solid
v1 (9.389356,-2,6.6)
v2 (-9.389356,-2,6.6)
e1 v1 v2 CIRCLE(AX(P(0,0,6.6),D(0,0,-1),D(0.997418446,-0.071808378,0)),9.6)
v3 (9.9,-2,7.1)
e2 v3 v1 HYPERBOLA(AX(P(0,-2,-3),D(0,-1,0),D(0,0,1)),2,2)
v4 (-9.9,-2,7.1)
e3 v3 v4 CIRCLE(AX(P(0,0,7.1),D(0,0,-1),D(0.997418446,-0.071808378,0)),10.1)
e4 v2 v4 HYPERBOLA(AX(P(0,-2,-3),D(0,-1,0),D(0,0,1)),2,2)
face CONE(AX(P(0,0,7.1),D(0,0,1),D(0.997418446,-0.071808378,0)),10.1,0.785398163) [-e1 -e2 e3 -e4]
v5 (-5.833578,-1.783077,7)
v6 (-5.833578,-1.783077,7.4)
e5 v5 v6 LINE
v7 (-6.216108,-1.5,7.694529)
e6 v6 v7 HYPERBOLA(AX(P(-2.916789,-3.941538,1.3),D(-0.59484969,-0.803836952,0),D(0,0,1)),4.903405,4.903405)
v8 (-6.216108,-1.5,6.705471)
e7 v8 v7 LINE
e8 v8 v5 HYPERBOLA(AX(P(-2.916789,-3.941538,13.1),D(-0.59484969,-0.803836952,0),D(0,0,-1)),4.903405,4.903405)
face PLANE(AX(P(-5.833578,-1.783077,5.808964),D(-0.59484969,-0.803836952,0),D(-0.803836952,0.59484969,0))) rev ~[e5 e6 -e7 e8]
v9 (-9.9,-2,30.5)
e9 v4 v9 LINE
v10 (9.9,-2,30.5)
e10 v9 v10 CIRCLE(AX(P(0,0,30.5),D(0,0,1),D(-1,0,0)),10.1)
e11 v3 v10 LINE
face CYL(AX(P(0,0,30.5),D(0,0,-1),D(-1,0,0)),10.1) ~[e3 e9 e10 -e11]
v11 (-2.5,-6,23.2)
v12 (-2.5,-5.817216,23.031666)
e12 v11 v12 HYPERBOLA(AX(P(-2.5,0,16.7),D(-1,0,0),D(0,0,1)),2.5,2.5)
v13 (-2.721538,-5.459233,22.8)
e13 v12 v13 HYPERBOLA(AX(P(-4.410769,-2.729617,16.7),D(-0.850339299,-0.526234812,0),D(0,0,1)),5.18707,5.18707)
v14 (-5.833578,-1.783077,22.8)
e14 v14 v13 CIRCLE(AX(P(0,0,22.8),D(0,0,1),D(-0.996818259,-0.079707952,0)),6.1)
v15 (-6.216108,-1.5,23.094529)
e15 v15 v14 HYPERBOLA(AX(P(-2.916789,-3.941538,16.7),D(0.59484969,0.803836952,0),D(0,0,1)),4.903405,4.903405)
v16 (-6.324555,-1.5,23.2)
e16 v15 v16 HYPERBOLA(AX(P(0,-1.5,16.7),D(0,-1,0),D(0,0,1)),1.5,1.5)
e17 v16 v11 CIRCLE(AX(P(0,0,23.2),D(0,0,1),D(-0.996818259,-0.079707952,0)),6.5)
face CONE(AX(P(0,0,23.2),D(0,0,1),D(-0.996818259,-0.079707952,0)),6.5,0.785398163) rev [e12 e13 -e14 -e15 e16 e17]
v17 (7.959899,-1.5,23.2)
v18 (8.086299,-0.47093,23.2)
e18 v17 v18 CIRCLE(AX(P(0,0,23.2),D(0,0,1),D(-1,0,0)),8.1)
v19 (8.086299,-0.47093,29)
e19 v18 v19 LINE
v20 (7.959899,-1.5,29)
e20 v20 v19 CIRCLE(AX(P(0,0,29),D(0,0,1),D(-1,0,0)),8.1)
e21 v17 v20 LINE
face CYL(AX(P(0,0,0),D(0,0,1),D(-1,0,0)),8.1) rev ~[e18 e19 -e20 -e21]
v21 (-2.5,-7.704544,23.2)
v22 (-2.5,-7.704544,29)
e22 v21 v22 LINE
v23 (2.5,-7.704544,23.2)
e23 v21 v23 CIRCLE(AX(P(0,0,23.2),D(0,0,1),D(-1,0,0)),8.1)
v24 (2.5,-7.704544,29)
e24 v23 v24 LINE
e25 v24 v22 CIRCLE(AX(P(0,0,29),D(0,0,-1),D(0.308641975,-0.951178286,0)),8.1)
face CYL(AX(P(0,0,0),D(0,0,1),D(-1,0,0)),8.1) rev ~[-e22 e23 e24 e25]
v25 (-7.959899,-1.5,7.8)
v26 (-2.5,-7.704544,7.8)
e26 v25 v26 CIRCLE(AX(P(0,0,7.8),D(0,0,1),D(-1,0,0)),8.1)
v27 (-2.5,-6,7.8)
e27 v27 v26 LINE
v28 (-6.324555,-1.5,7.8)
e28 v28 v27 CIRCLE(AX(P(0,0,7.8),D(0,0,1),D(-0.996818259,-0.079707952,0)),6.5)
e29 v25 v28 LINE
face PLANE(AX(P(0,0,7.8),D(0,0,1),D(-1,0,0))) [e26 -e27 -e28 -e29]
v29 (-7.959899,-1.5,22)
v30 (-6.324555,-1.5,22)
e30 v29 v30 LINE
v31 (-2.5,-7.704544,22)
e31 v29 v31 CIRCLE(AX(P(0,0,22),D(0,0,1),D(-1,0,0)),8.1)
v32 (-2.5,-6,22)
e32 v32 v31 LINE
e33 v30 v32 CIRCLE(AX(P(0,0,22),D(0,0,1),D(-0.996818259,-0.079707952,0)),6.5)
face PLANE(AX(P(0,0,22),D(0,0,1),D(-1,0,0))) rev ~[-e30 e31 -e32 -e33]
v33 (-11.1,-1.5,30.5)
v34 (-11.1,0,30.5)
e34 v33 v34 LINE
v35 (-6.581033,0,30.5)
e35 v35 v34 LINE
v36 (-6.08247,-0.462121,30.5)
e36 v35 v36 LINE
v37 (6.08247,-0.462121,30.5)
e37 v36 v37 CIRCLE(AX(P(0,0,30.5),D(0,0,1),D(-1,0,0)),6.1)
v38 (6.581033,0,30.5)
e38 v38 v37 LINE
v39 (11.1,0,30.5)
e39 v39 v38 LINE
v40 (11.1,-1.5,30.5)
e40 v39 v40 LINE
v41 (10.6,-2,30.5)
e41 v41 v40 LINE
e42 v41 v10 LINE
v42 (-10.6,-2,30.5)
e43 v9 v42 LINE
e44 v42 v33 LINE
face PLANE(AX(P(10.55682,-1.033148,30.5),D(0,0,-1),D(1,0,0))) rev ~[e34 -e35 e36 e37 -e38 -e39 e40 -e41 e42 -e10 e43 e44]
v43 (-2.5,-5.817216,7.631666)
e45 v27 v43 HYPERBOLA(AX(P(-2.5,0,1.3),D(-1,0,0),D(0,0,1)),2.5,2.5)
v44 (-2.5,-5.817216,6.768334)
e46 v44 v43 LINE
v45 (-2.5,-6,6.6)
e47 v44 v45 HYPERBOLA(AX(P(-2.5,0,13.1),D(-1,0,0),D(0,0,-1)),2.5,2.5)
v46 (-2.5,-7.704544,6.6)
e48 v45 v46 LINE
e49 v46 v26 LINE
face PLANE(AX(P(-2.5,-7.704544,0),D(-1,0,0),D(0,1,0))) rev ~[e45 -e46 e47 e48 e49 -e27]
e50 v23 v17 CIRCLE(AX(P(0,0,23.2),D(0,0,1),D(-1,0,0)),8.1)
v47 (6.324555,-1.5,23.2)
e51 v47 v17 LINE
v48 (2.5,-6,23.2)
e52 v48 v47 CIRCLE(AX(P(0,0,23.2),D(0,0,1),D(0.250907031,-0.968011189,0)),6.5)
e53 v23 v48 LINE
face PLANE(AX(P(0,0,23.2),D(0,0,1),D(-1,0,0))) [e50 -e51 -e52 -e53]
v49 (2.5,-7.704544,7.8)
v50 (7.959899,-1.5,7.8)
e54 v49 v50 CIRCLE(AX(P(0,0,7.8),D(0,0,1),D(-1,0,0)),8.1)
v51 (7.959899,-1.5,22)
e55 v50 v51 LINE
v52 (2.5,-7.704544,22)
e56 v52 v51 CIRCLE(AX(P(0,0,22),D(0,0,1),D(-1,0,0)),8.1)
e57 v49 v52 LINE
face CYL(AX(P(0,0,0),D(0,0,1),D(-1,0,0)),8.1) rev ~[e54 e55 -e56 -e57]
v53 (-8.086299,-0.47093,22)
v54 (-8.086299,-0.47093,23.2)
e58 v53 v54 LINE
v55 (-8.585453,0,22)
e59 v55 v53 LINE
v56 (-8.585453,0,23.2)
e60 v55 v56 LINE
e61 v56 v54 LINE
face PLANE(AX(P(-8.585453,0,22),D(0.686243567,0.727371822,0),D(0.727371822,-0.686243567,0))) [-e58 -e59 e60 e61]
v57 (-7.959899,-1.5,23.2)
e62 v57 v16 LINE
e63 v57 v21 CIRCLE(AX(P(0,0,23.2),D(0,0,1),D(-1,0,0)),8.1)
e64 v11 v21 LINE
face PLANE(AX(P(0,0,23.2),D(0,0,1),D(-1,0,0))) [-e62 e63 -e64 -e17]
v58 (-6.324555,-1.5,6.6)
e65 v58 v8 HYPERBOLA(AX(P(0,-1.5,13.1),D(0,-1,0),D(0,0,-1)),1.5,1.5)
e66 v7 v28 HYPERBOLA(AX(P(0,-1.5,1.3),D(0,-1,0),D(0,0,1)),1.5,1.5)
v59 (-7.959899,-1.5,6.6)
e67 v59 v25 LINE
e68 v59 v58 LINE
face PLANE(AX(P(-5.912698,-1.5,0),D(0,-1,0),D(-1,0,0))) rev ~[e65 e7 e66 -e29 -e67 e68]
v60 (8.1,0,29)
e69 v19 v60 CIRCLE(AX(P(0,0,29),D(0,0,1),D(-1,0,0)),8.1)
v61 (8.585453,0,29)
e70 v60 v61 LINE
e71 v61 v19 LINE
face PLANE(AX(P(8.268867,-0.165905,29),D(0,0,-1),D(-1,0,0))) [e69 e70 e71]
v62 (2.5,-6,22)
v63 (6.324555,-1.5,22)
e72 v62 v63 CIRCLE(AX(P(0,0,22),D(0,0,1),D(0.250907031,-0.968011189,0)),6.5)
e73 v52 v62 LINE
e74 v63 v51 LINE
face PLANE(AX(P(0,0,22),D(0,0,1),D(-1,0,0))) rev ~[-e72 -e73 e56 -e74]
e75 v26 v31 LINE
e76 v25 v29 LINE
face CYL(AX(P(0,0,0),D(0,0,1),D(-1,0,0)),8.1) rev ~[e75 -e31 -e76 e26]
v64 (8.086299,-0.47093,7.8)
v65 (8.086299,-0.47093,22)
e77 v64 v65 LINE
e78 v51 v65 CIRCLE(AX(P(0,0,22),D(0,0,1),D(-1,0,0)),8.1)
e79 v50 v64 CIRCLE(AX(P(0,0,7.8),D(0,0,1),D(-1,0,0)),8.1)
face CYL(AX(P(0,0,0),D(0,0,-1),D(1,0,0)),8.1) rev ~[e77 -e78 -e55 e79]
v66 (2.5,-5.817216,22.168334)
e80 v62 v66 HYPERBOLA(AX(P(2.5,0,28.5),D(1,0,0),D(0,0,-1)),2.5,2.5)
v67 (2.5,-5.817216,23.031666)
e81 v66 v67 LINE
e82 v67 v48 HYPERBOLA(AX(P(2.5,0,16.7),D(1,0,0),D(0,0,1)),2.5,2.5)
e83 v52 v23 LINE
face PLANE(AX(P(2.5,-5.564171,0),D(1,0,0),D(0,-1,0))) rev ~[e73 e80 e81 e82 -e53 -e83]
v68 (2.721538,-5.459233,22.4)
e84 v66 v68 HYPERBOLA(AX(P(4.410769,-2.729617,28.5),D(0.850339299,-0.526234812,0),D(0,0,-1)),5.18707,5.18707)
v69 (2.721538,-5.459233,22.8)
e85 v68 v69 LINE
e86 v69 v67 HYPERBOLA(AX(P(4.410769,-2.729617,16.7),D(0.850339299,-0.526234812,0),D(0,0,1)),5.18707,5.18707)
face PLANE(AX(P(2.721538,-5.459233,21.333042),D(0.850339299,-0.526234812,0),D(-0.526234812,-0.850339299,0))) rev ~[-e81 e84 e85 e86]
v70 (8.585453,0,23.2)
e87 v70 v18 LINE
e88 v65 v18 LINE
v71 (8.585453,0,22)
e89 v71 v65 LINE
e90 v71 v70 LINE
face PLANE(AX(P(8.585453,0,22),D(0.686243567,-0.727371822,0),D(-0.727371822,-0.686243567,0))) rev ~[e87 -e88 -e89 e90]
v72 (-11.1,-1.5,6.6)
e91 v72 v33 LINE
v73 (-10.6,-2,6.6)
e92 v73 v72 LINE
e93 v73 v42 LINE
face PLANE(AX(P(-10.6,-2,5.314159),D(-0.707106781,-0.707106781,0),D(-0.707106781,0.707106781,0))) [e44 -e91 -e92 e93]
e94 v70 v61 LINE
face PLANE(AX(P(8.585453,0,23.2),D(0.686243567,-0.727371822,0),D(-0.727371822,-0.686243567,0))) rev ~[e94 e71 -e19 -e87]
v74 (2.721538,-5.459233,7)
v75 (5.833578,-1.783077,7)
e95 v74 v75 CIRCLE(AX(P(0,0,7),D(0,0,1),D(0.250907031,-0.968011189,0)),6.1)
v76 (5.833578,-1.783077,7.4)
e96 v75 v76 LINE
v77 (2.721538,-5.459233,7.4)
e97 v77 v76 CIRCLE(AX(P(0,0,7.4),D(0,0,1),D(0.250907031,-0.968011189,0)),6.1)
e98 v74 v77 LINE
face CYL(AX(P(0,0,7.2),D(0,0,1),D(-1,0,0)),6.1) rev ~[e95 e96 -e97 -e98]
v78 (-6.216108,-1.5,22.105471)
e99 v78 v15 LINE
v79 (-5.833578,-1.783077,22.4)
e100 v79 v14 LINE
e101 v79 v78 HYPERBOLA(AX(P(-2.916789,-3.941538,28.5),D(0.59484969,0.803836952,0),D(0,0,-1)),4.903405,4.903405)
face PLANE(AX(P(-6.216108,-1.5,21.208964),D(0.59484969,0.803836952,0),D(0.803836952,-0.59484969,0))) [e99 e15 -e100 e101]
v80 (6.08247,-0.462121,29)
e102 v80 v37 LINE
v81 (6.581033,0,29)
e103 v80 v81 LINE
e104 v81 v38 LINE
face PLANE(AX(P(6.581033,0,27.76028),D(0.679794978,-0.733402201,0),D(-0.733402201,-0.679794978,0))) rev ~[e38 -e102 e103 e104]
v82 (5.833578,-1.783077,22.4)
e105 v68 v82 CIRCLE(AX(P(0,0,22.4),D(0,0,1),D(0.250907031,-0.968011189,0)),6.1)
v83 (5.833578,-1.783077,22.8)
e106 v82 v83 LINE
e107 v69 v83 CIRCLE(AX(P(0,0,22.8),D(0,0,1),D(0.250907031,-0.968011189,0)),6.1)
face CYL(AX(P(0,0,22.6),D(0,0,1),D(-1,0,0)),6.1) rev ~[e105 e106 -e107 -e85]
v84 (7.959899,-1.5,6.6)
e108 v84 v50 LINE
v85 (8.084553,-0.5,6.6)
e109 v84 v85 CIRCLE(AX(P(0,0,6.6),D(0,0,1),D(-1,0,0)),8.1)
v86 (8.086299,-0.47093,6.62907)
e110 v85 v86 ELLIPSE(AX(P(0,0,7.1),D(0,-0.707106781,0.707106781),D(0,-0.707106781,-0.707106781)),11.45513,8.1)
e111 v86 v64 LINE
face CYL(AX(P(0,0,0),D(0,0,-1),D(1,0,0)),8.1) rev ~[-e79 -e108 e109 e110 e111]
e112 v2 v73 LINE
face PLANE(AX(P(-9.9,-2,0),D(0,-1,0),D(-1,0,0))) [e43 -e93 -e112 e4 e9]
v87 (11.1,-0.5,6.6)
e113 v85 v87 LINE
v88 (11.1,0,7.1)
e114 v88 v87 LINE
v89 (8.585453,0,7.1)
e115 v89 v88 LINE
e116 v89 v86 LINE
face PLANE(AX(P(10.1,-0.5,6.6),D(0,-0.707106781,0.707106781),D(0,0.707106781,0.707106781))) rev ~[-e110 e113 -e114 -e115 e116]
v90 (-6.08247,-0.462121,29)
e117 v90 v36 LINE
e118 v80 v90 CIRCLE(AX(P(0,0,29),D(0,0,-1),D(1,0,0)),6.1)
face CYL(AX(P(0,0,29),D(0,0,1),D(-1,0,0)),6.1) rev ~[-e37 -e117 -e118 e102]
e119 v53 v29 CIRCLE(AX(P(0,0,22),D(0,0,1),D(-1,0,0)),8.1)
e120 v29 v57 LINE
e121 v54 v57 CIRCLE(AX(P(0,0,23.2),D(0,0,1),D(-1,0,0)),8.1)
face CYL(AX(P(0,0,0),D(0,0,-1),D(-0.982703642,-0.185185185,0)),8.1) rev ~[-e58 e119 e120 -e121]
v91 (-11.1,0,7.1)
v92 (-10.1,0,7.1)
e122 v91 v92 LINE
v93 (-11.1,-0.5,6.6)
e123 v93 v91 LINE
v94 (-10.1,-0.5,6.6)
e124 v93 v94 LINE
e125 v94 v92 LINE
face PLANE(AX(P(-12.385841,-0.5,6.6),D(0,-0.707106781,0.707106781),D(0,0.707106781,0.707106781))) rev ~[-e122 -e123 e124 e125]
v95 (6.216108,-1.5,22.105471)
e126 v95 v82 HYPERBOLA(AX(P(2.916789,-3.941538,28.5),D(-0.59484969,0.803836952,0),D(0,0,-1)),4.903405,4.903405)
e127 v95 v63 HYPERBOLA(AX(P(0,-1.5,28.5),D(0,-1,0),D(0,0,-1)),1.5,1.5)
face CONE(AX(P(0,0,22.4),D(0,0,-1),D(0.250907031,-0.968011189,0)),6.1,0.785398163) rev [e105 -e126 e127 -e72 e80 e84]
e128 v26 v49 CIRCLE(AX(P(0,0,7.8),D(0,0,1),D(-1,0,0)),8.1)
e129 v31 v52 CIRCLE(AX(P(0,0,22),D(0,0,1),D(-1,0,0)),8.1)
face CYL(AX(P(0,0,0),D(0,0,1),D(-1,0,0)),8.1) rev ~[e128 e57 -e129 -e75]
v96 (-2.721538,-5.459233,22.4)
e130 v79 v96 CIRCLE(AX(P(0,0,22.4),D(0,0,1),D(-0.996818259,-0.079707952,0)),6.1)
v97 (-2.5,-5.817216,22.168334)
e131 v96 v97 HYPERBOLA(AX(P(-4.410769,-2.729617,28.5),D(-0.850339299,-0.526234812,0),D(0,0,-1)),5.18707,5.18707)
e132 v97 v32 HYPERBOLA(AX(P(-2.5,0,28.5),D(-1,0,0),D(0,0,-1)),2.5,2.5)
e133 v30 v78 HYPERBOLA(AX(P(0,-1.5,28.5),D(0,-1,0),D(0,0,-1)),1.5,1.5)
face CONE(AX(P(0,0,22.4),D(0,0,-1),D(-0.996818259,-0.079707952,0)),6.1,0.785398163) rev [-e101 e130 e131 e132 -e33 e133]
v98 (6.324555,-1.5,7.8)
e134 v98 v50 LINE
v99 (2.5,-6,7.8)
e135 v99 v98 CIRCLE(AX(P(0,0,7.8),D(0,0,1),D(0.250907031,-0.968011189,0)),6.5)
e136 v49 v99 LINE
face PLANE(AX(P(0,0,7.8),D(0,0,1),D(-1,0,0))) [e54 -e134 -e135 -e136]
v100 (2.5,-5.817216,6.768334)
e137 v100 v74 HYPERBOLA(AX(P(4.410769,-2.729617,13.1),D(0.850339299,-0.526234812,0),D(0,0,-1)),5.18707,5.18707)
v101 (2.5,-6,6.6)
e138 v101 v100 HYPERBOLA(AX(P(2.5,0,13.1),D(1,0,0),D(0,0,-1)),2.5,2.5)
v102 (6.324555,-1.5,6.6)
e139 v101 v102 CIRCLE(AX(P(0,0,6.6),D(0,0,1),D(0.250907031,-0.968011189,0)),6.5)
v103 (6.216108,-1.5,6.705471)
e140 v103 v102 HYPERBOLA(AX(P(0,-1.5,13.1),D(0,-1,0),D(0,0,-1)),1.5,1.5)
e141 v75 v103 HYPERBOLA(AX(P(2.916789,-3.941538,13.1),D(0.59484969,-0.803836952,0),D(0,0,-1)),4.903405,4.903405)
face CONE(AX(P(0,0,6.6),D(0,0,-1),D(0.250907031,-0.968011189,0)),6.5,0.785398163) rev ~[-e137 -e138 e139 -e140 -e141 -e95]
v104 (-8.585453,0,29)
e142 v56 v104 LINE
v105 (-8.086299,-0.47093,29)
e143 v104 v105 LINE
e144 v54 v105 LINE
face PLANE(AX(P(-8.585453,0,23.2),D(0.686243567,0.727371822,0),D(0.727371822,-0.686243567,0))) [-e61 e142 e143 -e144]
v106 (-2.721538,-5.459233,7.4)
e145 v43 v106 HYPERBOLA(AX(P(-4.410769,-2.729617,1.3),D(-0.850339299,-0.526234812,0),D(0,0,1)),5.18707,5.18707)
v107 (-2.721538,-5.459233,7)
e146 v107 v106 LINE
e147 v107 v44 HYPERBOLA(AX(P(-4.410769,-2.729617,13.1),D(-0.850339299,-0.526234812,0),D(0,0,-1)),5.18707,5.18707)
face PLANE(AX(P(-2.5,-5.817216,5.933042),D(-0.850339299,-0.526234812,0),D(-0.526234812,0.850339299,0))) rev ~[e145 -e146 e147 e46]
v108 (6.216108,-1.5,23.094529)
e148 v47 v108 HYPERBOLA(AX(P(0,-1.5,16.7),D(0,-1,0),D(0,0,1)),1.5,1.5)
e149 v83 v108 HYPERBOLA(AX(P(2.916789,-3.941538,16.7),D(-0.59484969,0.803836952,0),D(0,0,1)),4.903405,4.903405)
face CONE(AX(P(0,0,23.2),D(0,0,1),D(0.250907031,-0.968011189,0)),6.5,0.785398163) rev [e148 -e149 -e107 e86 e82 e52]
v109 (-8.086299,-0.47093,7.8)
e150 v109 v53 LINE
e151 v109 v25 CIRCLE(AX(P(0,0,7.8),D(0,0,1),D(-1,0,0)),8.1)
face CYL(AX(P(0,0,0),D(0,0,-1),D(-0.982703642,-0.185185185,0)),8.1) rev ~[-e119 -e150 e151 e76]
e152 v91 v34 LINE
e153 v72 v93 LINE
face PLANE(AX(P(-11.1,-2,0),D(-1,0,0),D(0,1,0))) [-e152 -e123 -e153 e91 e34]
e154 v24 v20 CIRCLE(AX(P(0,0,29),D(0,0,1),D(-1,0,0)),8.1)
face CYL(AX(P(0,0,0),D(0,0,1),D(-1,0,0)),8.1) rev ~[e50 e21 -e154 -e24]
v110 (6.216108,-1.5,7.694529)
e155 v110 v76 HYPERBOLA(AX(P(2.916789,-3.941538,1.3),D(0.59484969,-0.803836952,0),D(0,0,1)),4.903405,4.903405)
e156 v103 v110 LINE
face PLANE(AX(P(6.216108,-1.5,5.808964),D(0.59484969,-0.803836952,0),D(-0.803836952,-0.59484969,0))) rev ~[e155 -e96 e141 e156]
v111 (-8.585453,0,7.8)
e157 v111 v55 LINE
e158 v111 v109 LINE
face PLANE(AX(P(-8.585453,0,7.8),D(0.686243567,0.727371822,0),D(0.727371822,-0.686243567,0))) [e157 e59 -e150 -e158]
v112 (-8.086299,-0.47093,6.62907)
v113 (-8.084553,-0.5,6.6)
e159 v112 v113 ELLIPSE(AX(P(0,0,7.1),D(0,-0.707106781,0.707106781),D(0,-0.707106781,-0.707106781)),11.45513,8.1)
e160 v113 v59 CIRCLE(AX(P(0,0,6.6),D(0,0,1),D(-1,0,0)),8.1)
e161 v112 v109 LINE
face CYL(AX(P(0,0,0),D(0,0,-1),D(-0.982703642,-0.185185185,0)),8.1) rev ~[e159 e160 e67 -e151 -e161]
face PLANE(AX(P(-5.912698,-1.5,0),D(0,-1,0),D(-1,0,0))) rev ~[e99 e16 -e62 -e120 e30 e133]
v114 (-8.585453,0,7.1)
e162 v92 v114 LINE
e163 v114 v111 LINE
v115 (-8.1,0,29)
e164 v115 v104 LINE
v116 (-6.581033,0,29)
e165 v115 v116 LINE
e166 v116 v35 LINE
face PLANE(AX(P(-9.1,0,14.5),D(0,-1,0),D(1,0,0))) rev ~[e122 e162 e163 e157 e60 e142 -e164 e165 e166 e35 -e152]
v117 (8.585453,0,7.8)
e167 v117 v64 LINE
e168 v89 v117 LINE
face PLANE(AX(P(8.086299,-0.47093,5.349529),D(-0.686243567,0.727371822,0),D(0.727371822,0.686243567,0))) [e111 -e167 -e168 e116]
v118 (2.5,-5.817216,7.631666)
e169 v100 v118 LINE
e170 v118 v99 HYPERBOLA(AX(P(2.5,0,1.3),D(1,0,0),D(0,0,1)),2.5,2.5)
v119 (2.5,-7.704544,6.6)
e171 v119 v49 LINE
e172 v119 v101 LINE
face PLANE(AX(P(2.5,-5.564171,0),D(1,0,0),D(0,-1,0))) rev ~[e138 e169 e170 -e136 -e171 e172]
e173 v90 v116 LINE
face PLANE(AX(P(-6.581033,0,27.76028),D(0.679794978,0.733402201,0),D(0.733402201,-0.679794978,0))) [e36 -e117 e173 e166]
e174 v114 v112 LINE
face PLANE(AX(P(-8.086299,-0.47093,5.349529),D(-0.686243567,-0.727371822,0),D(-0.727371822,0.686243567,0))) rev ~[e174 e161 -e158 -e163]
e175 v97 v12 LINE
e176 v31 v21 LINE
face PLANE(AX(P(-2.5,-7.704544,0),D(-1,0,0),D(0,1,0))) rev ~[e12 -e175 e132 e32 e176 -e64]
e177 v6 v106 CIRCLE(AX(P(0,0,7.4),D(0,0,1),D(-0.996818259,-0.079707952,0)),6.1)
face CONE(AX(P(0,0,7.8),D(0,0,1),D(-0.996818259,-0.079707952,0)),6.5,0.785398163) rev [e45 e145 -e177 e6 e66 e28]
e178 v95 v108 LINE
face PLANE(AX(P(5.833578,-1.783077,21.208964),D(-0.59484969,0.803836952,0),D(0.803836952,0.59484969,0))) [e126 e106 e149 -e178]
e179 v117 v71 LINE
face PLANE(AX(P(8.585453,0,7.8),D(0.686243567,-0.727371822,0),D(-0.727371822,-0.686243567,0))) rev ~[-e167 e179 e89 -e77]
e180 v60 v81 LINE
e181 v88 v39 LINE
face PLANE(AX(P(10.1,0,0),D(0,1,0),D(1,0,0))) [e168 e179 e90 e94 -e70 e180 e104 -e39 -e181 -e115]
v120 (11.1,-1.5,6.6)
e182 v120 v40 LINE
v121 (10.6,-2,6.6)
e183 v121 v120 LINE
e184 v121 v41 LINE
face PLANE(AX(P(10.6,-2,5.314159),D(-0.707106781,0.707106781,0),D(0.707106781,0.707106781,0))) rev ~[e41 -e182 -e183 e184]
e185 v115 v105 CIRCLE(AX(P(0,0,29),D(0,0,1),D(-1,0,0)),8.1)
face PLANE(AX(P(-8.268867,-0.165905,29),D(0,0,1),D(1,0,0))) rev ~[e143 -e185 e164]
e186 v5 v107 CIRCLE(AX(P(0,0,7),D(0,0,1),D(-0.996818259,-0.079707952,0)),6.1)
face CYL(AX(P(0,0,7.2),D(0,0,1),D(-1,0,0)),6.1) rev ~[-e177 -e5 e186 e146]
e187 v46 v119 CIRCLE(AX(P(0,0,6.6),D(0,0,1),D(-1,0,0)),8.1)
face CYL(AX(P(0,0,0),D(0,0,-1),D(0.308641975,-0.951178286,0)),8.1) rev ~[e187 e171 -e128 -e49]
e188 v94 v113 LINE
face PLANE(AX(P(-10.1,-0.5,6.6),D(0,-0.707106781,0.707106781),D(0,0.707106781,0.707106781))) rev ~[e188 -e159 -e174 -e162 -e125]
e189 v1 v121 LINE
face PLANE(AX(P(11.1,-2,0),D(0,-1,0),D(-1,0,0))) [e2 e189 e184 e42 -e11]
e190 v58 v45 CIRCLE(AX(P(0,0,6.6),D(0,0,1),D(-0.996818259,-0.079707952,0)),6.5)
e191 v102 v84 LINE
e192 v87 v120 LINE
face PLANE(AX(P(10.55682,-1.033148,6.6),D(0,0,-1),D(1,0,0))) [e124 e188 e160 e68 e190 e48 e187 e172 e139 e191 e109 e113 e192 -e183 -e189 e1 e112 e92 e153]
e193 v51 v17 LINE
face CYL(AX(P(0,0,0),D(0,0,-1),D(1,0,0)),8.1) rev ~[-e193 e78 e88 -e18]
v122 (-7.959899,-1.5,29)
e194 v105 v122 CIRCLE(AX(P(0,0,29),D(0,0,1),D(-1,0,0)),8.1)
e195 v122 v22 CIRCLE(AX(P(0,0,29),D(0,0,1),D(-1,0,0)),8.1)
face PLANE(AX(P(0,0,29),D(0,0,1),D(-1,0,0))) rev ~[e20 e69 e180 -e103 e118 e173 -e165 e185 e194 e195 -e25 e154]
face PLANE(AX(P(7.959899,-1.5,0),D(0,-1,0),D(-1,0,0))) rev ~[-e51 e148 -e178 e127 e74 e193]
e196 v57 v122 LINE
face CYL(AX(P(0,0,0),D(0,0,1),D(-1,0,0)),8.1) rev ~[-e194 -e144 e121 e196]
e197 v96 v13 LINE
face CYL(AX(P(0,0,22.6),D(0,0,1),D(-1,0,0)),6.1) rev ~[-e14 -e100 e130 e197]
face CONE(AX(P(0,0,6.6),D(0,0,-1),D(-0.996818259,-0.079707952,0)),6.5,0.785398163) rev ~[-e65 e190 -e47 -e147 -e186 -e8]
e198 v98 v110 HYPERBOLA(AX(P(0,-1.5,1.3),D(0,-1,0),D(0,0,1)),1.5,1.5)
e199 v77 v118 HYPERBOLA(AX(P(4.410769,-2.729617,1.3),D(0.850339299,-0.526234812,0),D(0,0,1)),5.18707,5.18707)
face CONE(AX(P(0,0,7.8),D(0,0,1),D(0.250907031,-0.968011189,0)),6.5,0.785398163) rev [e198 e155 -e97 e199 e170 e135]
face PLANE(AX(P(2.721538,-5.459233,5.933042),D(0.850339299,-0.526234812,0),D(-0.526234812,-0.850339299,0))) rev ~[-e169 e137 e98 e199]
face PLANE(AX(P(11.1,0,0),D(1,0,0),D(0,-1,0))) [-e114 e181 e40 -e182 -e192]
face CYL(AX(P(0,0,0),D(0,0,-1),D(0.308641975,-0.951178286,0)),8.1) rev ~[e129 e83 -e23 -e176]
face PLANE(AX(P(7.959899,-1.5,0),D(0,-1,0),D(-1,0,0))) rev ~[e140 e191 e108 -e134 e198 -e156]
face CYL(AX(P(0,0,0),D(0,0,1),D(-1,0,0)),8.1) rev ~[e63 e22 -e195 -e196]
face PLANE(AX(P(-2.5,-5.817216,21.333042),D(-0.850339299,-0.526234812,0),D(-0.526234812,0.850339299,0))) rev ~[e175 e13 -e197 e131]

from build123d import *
from build123d import SkipClean  # not in build123d's __all__

# Parameters (mm, degrees)
F0_W         = 2
F0_H         = 1.2
F1_ANGLE     = 180
F3_DEPTH     = 29
F5_DEPTH     = 30.5
F6_DEPTH     = 6.6
F7_T1_DEPTH  = 26.471682988
F7_T3_DEPTH  = 14.2
F7_T5_DEPTH  = 2.285841494
F7_T7_DEPTH  = 3.285841494
F7_T9_DEPTH  = 3.9794390696
F7_T11_DEPTH = 3.285841494
F7_T13_DEPTH = 2.285841494
F7_T15_DEPTH = 2.4504714643
F7_T17_DEPTH = 1.2
F7_T19_DEPTH = 5.8
F7_T24_ANGLE = 171.7642778101
F8_T1_DEPTH  = 2.5339152929
F8_T3_DEPTH  = 2.7820723675
F8_T5_DEPTH  = 2.7820723675
F8_T7_DEPTH  = 2.5339152929
F8_T10_ANGLE = 70.8970289143
F8_T12_ANGLE = 70.8970289143
F8_T14_ANGLE = 70.8970289143
F8_T16_ANGLE = 70.8970289143
F8_T18_ANGLE = 70.8970289143
F8_T20_ANGLE = 70.8970289143
F8_T22_ANGLE = 70.8970289143
F8_T24_ANGLE = 70.8970289143


# Not quite as in the source:
# - a fillet or chamfer that OpenCascade refuses, or shapes differently, is made with other operations: its cross-section is extruded or revolved along the edge and cut away or added
# - a feature names something its author has since deleted; it is built from what else it names


with BuildPart() as f1:
    # F0 (on Front) → F1 (revolve)
    with BuildSketch(Plane.XZ):
        Polygon((-10.1, 0), (-8.1, 0), (-8.1, 6.6), (-8.1, 7.8), (-8.1, 12.7), (-8.1, 13.9), (-8.1, 15.8), (-8.1, 17), (-8.1, 22), (-8.1, 23.2), (-8.1, 29), (-10.1, 29), align=None)
        with Locations((-7.1, 22.6)):
            Rectangle(F0_W, F0_H)
        with Locations((-7.1, 7.2)):
            Rectangle(F0_W, F0_H)
        Polygon((-10.1, 30.5), (-10.1, 29), (-8.1, 29), (-6.1, 29), (-6.1, 30.5), align=None)
    revolve(axis=Axis((0, 0, 18.970021978), (0, 0, 1)), revolution_arc=F1_ANGLE)

    # F2 (on face) → F3 (cut, through all)
    with BuildSketch(Plane(origin=(0, 0, 0), x_dir=(1, 0, 0), z_dir=(0, 0, -1))):
        with BuildLine():
            Line((2.5, 5.5641710973), (2.5, 7.7045441137))
            ThreePointArc((2.5, 7.7045441137), (0, 8.1), (-2.5, 7.7045441137))
            Line((-2.5, 7.7045441137), (-2.5, 5.5641710973))
            Line((-2.5, 5.5641710973), (2.5, 5.5641710973))
        make_face()
        with BuildLine():
            ThreePointArc((8.1, 0), (8.0648988191, 0.7532642549), (7.9598994969, 1.5))
            Line((7.9598994969, 1.5), (5.9126981996, 1.5))
            Line((5.9126981996, 1.5), (5.9126981996, 0))
            Line((5.9126981996, 0), (8.1, 0))
        make_face()
        with BuildLine():
            Line((-5.9126981996, 1.5), (-7.9598994969, 1.5))
            ThreePointArc((-7.9598994969, 1.5), (-8.0648988191, 0.7532642549), (-8.1, 0))
            Line((-8.1, 0), (-5.9126981996, 0))
            Line((-5.9126981996, 0), (-5.9126981996, 1.5))
        make_face()
    with SkipClean():  # cleaning this boolean's faces spoils the solid; the shape is the same uncleaned
        extrude(amount=-F3_DEPTH, mode=Mode.SUBTRACT)

    # F4 (on face) → F5 (join, through all)
    with BuildSketch(Plane(origin=(0, 0, 0), x_dir=(1, 0, 0), z_dir=(0, 0, -1))):
        with BuildLine():
            Line((11.1, 2), (9.9, 2))
            ThreePointArc((9.9, 2), (10.0498756211, 1.0049875621), (10.1, 0))
            Line((10.1, 0), (11.1, 0))
            Line((11.1, 0), (11.1, 2))
        make_face()
        with BuildLine():
            Line((-11.1, 0), (-10.1, 0))
            ThreePointArc((-10.1, 0), (-10.0498756211, 1.0049875621), (-9.9, 2))
            Line((-9.9, 2), (-11.1, 2))
            Line((-11.1, 2), (-11.1, 0))
        make_face()
    with SkipClean():  # cleaning this boolean's faces spoils the solid; the shape is the same uncleaned
        extrude(amount=-F5_DEPTH)

    # F4 (on face) + F2 (on face) → F6 (cut, through all)
    with BuildSketch(Plane(origin=(0, 0, 0), x_dir=(1, 0, 0), z_dir=(0, 0, -1))):
        with BuildLine():
            Line((-9.1, 2), (-9.1, 0))
            Line((-9.1, 0), (-8.1, 0))
            ThreePointArc((-8.1, 0), (-8.0648988191, 0.7532642549), (-7.9598994969, 1.5))
            ThreePointArc((-7.9598994969, 1.5), (-6.0808277632, 5.3510310889), (-2.5, 7.7045441137))
            ThreePointArc((-2.5, 7.7045441137), (0, 8.1), (2.5, 7.7045441137))
            ThreePointArc((2.5, 7.7045441137), (6.0808277632, 5.3510310889), (7.9598994969, 1.5))
            ThreePointArc((7.9598994969, 1.5), (8.0648988191, 0.7532642549), (8.1, 0))
            Line((8.1, 0), (9.1, 0))
            Line((9.1, 0), (9.1, 2))
            Line((9.1, 2), (9.9, 2))
            ThreePointArc((9.9, 2), (0, 10.1), (-9.9, 2))
            Line((-9.9, 2), (-9.1, 2))
        make_face()
        with BuildLine():
            Line((-11.1, 0), (-10.1, 0))
            ThreePointArc((-10.1, 0), (-10.0498756211, 1.0049875621), (-9.9, 2))
            Line((-9.9, 2), (-11.1, 2))
            Line((-11.1, 2), (-11.1, 0))
        make_face()
        with BuildLine():
            Line((-10.1, 0), (-9.1, 0))
            Line((-9.1, 0), (-9.1, 2))
            Line((-9.1, 2), (-9.9, 2))
            ThreePointArc((-9.9, 2), (-10.0498756211, 1.0049875621), (-10.1, 0))
        make_face()
        with BuildLine():
            Line((11.1, 2), (9.9, 2))
            ThreePointArc((9.9, 2), (10.0498756211, 1.0049875621), (10.1, 0))
            Line((10.1, 0), (11.1, 0))
            Line((11.1, 0), (11.1, 2))
        make_face()
    with BuildSketch(Plane(origin=(0, 0, 0), x_dir=(1, 0, 0), z_dir=(0, 0, -1))):
        with BuildLine():
            ThreePointArc((-2.5, 7.7045441137), (0, 8.1), (2.5, 7.7045441137))
            ThreePointArc((2.5, 7.7045441137), (6.0808277632, 5.3510310889), (7.9598994969, 1.5))
            ThreePointArc((7.9598994969, 1.5), (8.0648988191, 0.7532642549), (8.1, 0))
            Line((8.1, 0), (10.1, 0))
            ThreePointArc((10.1, 0), (0, 10.1), (-10.1, 0))
            Line((-10.1, 0), (-8.1, 0))
            ThreePointArc((-8.1, 0), (-8.0648988191, 0.7532642549), (-7.9598994969, 1.5))
            ThreePointArc((-7.9598994969, 1.5), (-6.0808277632, 5.3510310889), (-2.5, 7.7045441137))
        make_face()
    with SkipClean():  # cleaning this boolean's faces spoils the solid; the shape is the same uncleaned
        extrude(amount=-F6_DEPTH, mode=Mode.SUBTRACT)

    # F7: chamfer of 0.5 on 11 edges, made by hand

    # F7_s2 → F7_t1 (cut)
    with BuildSketch(Plane.XY.offset(5.314158506)):
        Polygon((-10.6, -2), (-11.1, -1.5), (-11.1, -2), align=None)
        Polygon((10.6, -2), (11.1, -1.5), (11.1, -2), align=None)
    with SkipClean():  # cleaning this boolean's faces spoils the solid; the shape is the same uncleaned
        extrude(amount=F7_T1_DEPTH, mode=Mode.SUBTRACT)

    # F7_s4 → F7_t3 (cut)
    with BuildSketch(Plane.XY.offset(7.8)):
        with BuildLine():
            Line((8.5854528128, 0), (8.0862985795, -0.4709302326))
            ThreePointArc((8.0862985795, -0.4709302326), (8.0963649191, -0.2426419097), (8.1, 0))
            Line((8.1, 0), (8.5854528128, 0))
        make_face()
        with BuildLine():
            Line((-8.5854528128, 0), (-8.0862985795, -0.4709302326))
            ThreePointArc((-8.0862985795, -0.4709302326), (-8.0963649191, -0.2426419097), (-8.1, 0))
            Line((-8.1, 0), (-8.5854528128, 0))
        make_face()
    extrude(amount=F7_T3_DEPTH, mode=Mode.SUBTRACT)

    # F7_s6 → F7_t5 (cut)
    with BuildSketch(Plane.YZ.offset(-12.385841494)):
        Polygon((-0.5, 6.6), (0, 7.1), (0, 6.6), align=None)
    extrude(amount=F7_T5_DEPTH, mode=Mode.SUBTRACT)

    # F7_s8 → F7_t7 (cut)
    with BuildSketch(Plane.YZ.offset(-10.1)):
        Polygon((-0.5, 6.6), (0, 7.1), (0, 6.6), align=None)
    extrude(amount=F7_T7_DEPTH, mode=Mode.SUBTRACT)

    # F7_s10 → F7_t9 (cut)
    with BuildSketch(Plane.XY.offset(27.7602804652)):
        with BuildLine():
            Line((-6.5810333535, 0), (-6.0824702207, -0.4621212121))
            ThreePointArc((-6.0824702207, -0.4621212121), (-6.0953433287, -0.2383059061), (-6.1, 0))
            Line((-6.1, 0), (-6.5810333535, 0))
        make_face()
        with BuildLine():
            Line((6.5810333535, 0), (6.0824702207, -0.4621212121))
            ThreePointArc((6.0824702207, -0.4621212121), (6.0953433287, -0.2383059061), (6.1, 0))
            Line((6.1, 0), (6.5810333535, 0))
        make_face()
    with SkipClean():  # cleaning this boolean's faces spoils the solid; the shape is the same uncleaned
        extrude(amount=F7_T9_DEPTH, mode=Mode.SUBTRACT)

    # F7_s12 → F7_t11 (cut)
    with BuildSketch(Plane.YZ.offset(6.814158506)):
        Polygon((-0.5, 6.6), (0, 7.1), (0, 6.6), align=None)
    extrude(amount=F7_T11_DEPTH, mode=Mode.SUBTRACT)

    # F7_s14 → F7_t13 (cut)
    with BuildSketch(Plane.YZ.offset(10.1)):
        Polygon((-0.5, 6.6), (0, 7.1), (0, 6.6), align=None)
    extrude(amount=F7_T13_DEPTH, mode=Mode.SUBTRACT)

    # F7_s16 → F7_t15 (cut)
    with BuildSketch(Plane.XY.offset(5.3495285357)):
        with BuildLine():
            Line((-8.0862985795, -0.4709302326), (-8.5854528128, 0))
            Line((-8.5854528128, 0), (-8.1, 0))
            ThreePointArc((-8.1, 0), (-8.0963649191, -0.2426419097), (-8.0862985795, -0.4709302326))
        make_face()
        with BuildLine():
            Line((8.0862985795, -0.4709302326), (8.5854528128, 0))
            Line((8.5854528128, 0), (8.1, 0))
            ThreePointArc((8.1, 0), (8.0963649191, -0.2426419097), (8.0862985795, -0.4709302326))
        make_face()
    with SkipClean():  # cleaning this boolean's faces spoils the solid; the shape is the same uncleaned
        extrude(amount=F7_T15_DEPTH, mode=Mode.SUBTRACT)

    # F7_s18 → F7_t17 (cut)
    with BuildSketch(Plane.XY.offset(22)):
        with BuildLine():
            Line((-8.5854528128, 0), (-8.0862985795, -0.4709302326))
            ThreePointArc((-8.0862985795, -0.4709302326), (-8.0963649191, -0.2426419097), (-8.1, 0))
            Line((-8.1, 0), (-8.5854528128, 0))
        make_face()
        with BuildLine():
            Line((8.5854528128, 0), (8.0862985795, -0.4709302326))
            ThreePointArc((8.0862985795, -0.4709302326), (8.0963649191, -0.2426419097), (8.1, 0))
            Line((8.1, 0), (8.5854528128, 0))
        make_face()
    with SkipClean():  # cleaning this boolean's faces spoils the solid; the shape is the same uncleaned
        extrude(amount=F7_T17_DEPTH, mode=Mode.SUBTRACT)

    # F7_s20 → F7_t19 (cut)
    with BuildSketch(Plane.XY.offset(23.2)):
        with BuildLine():
            Line((-8.5854528128, 0), (-8.0862985795, -0.4709302326))
            ThreePointArc((-8.0862985795, -0.4709302326), (-8.0963649191, -0.2426419097), (-8.1, 0))
            Line((-8.1, 0), (-8.5854528128, 0))
        make_face()
        with BuildLine():
            Line((8.5854528128, 0), (8.0862985795, -0.4709302326))
            ThreePointArc((8.0862985795, -0.4709302326), (8.0963649191, -0.2426419097), (8.1, 0))
            Line((8.1, 0), (8.5854528128, 0))
        make_face()
    with SkipClean():  # cleaning this boolean's faces spoils the solid; the shape is the same uncleaned
        extrude(amount=F7_T19_DEPTH, mode=Mode.SUBTRACT)


with BuildPart() as f7_tool22:
    # F7_s23 → F7_t24 (revolve)
    with BuildSketch(Plane(origin=(0, 0, 0), x_dir=(0, 0, 1), z_dir=(0.071808378, 0.9974184462, 0))):
        Polygon((7.1, 10.1), (6.6, 9.6), (6.6, 10.1), align=None)
    revolve(axis=Axis((0, 0, 6.6), (0, 0, -1)), revolution_arc=F7_T24_ANGLE)

    split(bisect_by=Plane.XZ.offset(2), keep=Keep.TOP)


with BuildPart() as f1_1:
    add(f1.part, clean=False)

    # F7_t21: cut F7_tool22
    add(f7_tool22.part, mode=Mode.SUBTRACT)

    # F8: chamfer of 0.4 on 16 edges, made by hand

    # F8_s2 → F8_t1 (cut)
    with BuildSketch(Plane.XY.offset(5.9330423536)):
        with BuildLine():
            Line((2.7215384615, -5.4592333164), (2.5, -5.8172158289))
            Line((2.5, -5.8172158289), (2.5, -5.5641710973))
            ThreePointArc((2.5, -5.5641710973), (2.6173705778, -5.5099338706), (2.7215384615, -5.4592333164))
        make_face()
        with BuildLine():
            Line((-2.5, -5.8172158289), (-2.7215384615, -5.4592333164))
            ThreePointArc((-2.7215384615, -5.4592333164), (-2.6173705778, -5.5099338706), (-2.5, -5.5641710973))
            Line((-2.5, -5.5641710973), (-2.5, -5.8172158289))
        make_face()
    extrude(amount=F8_T1_DEPTH, mode=Mode.SUBTRACT)

    # F8_s4 → F8_t3 (cut)
    with BuildSketch(Plane.XY.offset(5.8089638162)):
        with BuildLine():
            Line((6.2161081072, -1.5), (5.8335783775, -1.7830769231))
            ThreePointArc((5.8335783775, -1.7830769231), (5.8731388435, -1.6481019766), (5.9126981996, -1.5))
            Line((5.9126981996, -1.5), (6.2161081072, -1.5))
        make_face()
        with BuildLine():
            Line((-5.8335783775, -1.7830769231), (-6.2161081072, -1.5))
            Line((-6.2161081072, -1.5), (-5.9126981996, -1.5))
            ThreePointArc((-5.9126981996, -1.5), (-5.8731388435, -1.6481019766), (-5.8335783775, -1.7830769231))
        make_face()
    extrude(amount=F8_T3_DEPTH, mode=Mode.SUBTRACT)

    # F8_s6 → F8_t5 (cut)
    with BuildSketch(Plane.XY.offset(21.2089638162)):
        with BuildLine():
            Line((-6.2161081072, -1.5), (-5.8335783775, -1.7830769231))
            ThreePointArc((-5.8335783775, -1.7830769231), (-5.8731388435, -1.6481019766), (-5.9126981996, -1.5))
            Line((-5.9126981996, -1.5), (-6.2161081072, -1.5))
        make_face()
        with BuildLine():
            Line((5.8335783775, -1.7830769231), (6.2161081072, -1.5))
            Line((6.2161081072, -1.5), (5.9126981996, -1.5))
            ThreePointArc((5.9126981996, -1.5), (5.8731388435, -1.6481019766), (5.8335783775, -1.7830769231))
        make_face()
    extrude(amount=F8_T5_DEPTH, mode=Mode.SUBTRACT)

    # F8_s8 → F8_t7 (cut)
    with BuildSketch(Plane.XY.offset(21.3330423536)):
        with BuildLine():
            Line((-2.5, -5.8172158289), (-2.7215384615, -5.4592333164))
            ThreePointArc((-2.7215384615, -5.4592333164), (-2.6173705778, -5.5099338706), (-2.5, -5.5641710973))
            Line((-2.5, -5.5641710973), (-2.5, -5.8172158289))
        make_face()
        with BuildLine():
            Line((2.7215384615, -5.4592333164), (2.5, -5.8172158289))
            Line((2.5, -5.8172158289), (2.5, -5.5641710973))
            ThreePointArc((2.5, -5.5641710973), (2.6173705778, -5.5099338706), (2.7215384615, -5.4592333164))
        make_face()
    extrude(amount=F8_T7_DEPTH, mode=Mode.SUBTRACT)

    # F8_s9 → F8_t10 (revolve, cut)
    with BuildSketch(Plane(origin=(0, 0, 0), x_dir=(0, 0, 1), z_dir=(-0.968011189, -0.2509070307, 0))):
        Polygon((7.8, -6.5), (7.4, -6.1), (7.8, -6.1), align=None)
    revolve(axis=Axis((0, 0, 7.8), (0, 0, 1)), revolution_arc=F8_T10_ANGLE, mode=Mode.SUBTRACT)

    # F8_s11 → F8_t12 (revolve, cut)
    with BuildSketch(Plane(origin=(0, 0, 0), x_dir=(0, 0, 1), z_dir=(-0.968011189, -0.2509070307, 0))):
        Polygon((6.6, -6.5), (7, -6.1), (6.6, -6.1), align=None)
    revolve(axis=Axis((0, 0, 6.6), (0, 0, 1)), revolution_arc=F8_T12_ANGLE, mode=Mode.SUBTRACT)

    # F8_s13 → F8_t14 (revolve, cut)
    with BuildSketch(Plane(origin=(0, 0, 0), x_dir=(0, 0, 1), z_dir=(-0.0797079521, 0.9968182594, 0))):
        Polygon((7.8, -6.5), (7.4, -6.1), (7.8, -6.1), align=None)
    revolve(axis=Axis((0, 0, 7.8), (0, 0, 1)), revolution_arc=F8_T14_ANGLE, mode=Mode.SUBTRACT)

    # F8_s15 → F8_t16 (revolve, cut)
    with BuildSketch(Plane(origin=(0, 0, 0), x_dir=(0, 0, 1), z_dir=(-0.0797079521, 0.9968182594, 0))):
        Polygon((6.6, -6.5), (7, -6.1), (6.6, -6.1), align=None)
    revolve(axis=Axis((0, 0, 6.6), (0, 0, 1)), revolution_arc=F8_T16_ANGLE, mode=Mode.SUBTRACT)

    # F8_s17 → F8_t18 (revolve, cut)
    with BuildSketch(Plane(origin=(0, 0, 0), x_dir=(0, 0, 1), z_dir=(-0.0797079521, 0.9968182594, 0))):
        Polygon((23.2, -6.5), (22.8, -6.1), (23.2, -6.1), align=None)
    revolve(axis=Axis((0, 0, 23.2), (0, 0, 1)), revolution_arc=F8_T18_ANGLE, mode=Mode.SUBTRACT)

    # F8_s19 → F8_t20 (revolve, cut)
    with BuildSketch(Plane(origin=(0, 0, 0), x_dir=(0, 0, 1), z_dir=(-0.0797079521, 0.9968182594, 0))):
        Polygon((22.4, -6.1), (22, -6.5), (22, -6.1), align=None)
    revolve(axis=Axis((0, 0, 22), (0, 0, 1)), revolution_arc=F8_T20_ANGLE, mode=Mode.SUBTRACT)

    # F8_s21 → F8_t22 (revolve, cut)
    with BuildSketch(Plane(origin=(0, 0, 0), x_dir=(0, 0, 1), z_dir=(-0.968011189, -0.2509070307, 0))):
        Polygon((23.2, -6.5), (22.8, -6.1), (23.2, -6.1), align=None)
    revolve(axis=Axis((0, 0, 23.2), (0, 0, 1)), revolution_arc=F8_T22_ANGLE, mode=Mode.SUBTRACT)

    # F8_s23 → F8_t24 (revolve, cut)
    with BuildSketch(Plane(origin=(0, 0, 0), x_dir=(0, 0, 1), z_dir=(-0.968011189, -0.2509070307, 0))):
        Polygon((22.4, -6.1), (22, -6.5), (22, -6.1), align=None)
    revolve(axis=Axis((0, 0, 22), (0, 0, 1)), revolution_arc=F8_T24_ANGLE, mode=Mode.SUBTRACT)


solid = f1_1.part
